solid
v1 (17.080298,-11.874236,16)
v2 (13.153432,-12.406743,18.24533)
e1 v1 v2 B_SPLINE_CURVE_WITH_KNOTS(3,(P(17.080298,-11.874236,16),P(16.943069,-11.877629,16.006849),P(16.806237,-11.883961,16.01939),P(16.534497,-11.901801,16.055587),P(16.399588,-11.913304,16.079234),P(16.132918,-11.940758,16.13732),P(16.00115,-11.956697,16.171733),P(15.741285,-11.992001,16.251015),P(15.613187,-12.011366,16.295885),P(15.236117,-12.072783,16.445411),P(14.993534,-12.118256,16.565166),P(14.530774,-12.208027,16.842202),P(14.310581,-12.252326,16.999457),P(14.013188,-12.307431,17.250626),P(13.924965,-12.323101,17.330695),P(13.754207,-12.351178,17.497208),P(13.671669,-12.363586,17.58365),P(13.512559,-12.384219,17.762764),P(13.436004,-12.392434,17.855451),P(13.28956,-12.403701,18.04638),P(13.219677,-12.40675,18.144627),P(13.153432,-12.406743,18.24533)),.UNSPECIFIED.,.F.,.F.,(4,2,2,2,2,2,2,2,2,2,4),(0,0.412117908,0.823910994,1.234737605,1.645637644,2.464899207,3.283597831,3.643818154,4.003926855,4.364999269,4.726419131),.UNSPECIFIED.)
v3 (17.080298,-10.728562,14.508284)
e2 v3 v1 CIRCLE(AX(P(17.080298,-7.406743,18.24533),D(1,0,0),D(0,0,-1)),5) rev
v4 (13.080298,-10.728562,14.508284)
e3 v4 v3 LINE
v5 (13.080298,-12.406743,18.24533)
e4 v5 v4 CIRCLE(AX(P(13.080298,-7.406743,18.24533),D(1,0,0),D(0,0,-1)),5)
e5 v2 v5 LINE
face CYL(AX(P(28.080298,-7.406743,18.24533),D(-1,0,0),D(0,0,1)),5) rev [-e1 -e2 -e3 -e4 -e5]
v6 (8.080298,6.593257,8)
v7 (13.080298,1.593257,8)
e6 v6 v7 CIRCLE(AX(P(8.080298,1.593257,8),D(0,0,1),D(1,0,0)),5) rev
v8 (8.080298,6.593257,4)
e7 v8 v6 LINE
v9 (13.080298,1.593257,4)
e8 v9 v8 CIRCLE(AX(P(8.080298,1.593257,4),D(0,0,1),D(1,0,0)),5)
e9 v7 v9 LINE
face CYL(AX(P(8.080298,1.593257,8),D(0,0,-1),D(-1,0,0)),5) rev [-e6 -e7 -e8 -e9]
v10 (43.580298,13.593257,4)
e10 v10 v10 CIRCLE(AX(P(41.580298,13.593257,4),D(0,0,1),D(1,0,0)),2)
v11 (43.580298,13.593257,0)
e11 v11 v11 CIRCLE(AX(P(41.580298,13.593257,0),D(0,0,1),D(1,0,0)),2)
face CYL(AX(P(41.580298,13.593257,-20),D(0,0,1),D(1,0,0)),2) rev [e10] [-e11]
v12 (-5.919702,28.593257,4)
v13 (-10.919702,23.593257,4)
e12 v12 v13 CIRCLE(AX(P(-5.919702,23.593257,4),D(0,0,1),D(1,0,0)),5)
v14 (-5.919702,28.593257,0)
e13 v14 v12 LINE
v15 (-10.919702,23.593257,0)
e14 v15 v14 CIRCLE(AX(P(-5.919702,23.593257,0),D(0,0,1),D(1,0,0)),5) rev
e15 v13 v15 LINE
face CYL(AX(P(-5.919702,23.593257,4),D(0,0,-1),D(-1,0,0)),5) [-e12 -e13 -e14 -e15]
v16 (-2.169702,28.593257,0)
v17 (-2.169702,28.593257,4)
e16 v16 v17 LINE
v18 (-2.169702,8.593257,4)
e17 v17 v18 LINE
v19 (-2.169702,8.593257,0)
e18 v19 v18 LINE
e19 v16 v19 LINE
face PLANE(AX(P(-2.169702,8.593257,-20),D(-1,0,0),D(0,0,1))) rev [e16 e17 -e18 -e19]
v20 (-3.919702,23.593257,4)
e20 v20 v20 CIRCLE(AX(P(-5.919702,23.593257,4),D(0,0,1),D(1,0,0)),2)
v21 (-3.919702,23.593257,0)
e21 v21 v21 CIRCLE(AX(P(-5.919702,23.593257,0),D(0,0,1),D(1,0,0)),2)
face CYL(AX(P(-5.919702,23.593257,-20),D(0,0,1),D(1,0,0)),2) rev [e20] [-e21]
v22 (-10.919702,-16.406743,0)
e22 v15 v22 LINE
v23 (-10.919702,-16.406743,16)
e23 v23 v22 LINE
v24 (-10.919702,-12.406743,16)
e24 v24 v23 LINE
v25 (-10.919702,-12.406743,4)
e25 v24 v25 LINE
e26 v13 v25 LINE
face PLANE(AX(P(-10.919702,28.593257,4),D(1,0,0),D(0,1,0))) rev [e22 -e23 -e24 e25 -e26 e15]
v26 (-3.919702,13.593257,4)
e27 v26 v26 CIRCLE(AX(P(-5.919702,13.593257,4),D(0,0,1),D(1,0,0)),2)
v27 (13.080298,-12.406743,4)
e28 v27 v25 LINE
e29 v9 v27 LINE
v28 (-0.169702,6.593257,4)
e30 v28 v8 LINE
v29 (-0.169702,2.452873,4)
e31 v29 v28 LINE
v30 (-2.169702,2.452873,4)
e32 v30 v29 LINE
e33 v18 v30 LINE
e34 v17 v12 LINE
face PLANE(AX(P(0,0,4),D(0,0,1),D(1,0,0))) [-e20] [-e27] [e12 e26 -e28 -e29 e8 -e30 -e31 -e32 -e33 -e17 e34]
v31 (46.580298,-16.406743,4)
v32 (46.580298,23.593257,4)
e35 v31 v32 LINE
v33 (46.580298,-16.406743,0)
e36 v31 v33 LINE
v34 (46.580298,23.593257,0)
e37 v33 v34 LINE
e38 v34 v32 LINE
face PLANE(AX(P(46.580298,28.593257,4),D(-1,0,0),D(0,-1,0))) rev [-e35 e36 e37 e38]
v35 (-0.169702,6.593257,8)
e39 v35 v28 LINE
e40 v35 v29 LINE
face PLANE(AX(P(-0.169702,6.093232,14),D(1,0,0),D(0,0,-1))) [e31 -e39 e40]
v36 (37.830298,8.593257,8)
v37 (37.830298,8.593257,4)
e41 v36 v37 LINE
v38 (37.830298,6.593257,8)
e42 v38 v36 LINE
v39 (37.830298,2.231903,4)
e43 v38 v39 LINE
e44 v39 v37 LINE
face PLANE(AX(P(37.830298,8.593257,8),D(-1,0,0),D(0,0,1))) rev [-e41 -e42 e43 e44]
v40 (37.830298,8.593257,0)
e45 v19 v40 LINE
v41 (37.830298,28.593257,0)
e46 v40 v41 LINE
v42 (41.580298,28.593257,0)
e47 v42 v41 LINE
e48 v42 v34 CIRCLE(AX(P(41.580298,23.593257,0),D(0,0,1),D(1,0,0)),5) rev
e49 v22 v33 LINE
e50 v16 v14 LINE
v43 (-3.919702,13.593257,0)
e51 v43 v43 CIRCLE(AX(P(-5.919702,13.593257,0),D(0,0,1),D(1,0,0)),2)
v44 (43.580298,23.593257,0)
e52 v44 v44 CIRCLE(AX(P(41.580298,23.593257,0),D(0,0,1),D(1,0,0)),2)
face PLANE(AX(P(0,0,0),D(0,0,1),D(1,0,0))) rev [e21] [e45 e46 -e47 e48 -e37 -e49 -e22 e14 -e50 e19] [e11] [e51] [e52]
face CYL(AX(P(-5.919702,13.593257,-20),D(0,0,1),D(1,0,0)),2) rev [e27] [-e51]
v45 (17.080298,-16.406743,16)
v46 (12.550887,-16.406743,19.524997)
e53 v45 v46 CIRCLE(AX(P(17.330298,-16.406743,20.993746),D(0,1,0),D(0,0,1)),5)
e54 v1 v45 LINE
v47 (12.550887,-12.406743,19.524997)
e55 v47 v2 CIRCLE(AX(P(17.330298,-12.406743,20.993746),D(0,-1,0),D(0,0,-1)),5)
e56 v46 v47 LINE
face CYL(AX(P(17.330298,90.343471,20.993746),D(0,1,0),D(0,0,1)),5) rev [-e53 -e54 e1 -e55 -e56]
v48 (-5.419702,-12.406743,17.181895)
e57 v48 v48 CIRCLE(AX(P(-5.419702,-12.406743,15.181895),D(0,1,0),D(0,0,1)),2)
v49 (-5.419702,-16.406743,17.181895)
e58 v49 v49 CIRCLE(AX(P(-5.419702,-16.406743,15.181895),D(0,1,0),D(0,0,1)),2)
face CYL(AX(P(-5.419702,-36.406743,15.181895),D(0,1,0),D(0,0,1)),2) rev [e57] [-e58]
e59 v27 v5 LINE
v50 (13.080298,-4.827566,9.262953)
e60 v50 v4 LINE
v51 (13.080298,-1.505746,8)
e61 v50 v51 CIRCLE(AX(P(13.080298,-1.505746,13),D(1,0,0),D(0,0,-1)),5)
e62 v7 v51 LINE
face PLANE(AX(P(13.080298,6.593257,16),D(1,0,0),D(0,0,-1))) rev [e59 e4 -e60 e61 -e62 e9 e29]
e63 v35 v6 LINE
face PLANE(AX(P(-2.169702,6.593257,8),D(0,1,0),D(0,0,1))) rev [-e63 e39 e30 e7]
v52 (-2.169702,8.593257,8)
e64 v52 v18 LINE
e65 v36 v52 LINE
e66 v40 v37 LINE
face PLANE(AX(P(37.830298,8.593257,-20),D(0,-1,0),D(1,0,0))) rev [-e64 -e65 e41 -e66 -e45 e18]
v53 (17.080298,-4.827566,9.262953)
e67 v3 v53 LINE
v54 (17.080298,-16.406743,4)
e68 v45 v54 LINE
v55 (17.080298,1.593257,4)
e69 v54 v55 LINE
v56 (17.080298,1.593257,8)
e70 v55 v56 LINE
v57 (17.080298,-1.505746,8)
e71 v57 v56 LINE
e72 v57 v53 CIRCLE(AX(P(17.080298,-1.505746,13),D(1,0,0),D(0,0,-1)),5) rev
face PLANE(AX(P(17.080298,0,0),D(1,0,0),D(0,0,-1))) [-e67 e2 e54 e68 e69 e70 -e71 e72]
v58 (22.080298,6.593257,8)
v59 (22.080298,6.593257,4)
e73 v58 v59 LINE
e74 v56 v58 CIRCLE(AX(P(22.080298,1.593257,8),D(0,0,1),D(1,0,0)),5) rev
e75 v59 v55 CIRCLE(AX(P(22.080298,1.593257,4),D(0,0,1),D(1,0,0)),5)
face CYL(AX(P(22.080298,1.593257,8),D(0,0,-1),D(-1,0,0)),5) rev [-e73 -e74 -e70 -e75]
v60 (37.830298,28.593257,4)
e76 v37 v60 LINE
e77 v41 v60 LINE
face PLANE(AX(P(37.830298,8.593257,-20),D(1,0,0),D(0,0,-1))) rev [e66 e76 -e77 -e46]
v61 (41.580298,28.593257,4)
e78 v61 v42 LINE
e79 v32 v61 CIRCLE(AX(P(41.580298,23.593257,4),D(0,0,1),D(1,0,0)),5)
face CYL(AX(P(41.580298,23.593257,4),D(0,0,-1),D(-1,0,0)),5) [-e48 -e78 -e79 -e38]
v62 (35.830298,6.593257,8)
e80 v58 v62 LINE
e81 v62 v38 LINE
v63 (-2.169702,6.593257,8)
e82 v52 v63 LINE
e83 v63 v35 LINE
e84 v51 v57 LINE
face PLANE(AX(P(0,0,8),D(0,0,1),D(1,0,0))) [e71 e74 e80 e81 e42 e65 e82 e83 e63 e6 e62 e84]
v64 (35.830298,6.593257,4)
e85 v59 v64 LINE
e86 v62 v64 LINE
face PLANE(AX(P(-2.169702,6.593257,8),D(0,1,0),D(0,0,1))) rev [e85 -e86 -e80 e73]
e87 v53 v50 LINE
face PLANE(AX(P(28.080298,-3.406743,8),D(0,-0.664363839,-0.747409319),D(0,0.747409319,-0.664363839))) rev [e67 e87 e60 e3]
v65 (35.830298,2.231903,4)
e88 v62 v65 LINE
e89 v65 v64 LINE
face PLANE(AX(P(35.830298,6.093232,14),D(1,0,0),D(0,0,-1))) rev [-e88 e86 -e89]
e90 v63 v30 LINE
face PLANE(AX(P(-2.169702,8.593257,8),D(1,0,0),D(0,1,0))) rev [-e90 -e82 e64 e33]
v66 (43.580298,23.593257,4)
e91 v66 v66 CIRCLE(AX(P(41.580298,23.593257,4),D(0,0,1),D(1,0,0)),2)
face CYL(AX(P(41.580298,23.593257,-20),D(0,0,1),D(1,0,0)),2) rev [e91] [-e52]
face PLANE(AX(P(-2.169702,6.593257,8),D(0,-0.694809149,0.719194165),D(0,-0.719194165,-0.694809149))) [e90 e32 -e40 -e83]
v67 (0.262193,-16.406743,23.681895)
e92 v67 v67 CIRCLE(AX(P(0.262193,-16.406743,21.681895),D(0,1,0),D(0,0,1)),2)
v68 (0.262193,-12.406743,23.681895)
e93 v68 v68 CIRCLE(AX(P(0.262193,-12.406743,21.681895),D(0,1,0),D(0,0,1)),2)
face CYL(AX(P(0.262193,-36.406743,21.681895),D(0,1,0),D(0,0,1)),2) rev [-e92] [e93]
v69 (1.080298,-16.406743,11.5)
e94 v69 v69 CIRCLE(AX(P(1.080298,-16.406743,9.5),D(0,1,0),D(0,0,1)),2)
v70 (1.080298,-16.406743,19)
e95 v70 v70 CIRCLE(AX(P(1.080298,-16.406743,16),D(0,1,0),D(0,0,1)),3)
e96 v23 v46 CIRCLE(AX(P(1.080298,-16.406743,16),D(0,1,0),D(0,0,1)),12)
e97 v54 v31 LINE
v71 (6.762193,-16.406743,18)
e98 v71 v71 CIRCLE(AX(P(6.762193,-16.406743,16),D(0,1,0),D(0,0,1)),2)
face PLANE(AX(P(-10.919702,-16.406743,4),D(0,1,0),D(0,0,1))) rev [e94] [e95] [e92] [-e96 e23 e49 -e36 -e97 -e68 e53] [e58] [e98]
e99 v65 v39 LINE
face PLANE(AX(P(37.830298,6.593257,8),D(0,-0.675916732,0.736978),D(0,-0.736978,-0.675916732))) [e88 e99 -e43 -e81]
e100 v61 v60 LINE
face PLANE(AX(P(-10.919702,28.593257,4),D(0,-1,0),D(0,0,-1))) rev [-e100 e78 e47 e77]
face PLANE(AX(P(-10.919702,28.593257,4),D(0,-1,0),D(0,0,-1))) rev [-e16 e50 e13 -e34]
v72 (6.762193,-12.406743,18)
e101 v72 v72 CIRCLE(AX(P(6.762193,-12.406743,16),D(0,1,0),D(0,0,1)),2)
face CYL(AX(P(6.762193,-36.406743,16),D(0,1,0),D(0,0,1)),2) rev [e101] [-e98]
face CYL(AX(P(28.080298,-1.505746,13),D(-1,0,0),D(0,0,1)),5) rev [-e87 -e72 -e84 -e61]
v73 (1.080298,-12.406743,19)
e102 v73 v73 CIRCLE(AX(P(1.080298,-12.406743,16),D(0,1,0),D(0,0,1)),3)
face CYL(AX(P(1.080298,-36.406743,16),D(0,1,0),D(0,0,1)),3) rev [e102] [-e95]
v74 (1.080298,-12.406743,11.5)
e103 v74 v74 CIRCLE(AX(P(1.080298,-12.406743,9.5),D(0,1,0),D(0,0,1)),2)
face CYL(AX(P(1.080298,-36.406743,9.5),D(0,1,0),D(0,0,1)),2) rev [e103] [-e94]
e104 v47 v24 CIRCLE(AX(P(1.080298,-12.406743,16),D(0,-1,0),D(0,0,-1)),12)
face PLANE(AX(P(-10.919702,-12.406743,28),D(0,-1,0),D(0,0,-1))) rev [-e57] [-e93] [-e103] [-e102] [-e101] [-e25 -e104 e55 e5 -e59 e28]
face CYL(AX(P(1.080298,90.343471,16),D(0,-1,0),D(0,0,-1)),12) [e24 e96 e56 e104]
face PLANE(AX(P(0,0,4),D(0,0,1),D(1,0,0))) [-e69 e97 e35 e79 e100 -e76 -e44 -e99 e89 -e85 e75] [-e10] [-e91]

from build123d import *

# Parameters (mm, degrees)
SKETCH1_W           = 57.5
SKETCH1_H           = 45
BOSS_EXTRUDE1_DEPTH = 4
SKETCH4_W           = 24
SKETCH4_H           = 4
BOSS_EXTRUDE4_DEPTH = 24
CUT_EXTRUDE1_START  = -4
CUT_EXTRUDE1_DEPTH  = 4
SKETCH6_R           = 3
SKETCH6_R_2         = 2
CUT_EXTRUDE2_DEPTH  = 24
SKETCH7_R           = 2
SKETCH7_W           = 40
SKETCH7_H           = 20
CUT_EXTRUDE3_DEPTH  = 24
FILLET2_R           = 5
SKETCH9_W           = 40
SKETCH9_H           = 2
BOSS_EXTRUDE5_DEPTH = 4
RIB1_REACH          = 61.005
SKETCH10_WALL_W     = 125.416867366
SKETCH10_WALL_H     = 2
RIB5_REACH          = 61.005
SKETCH11_WALL_W     = 125.5713139
SKETCH11_WALL_H     = 2
SKETCH13_W          = 12
SKETCH13_H          = 4
BOSS_EXTRUDE7_DEPTH = 4
SKETCH15_W          = 4
SKETCH15_H          = 12
BOSS_EXTRUDE8_DEPTH = 19
CUT_EXTRUDE4_DEPTH  = 15
FILLET5_R           = 5
FILLET6_R           = 5


# Read off the part's stored shape, not the designer's step: Cut-Extrude1
with BuildPart() as part:
    # Sketch1 → Boss-Extrude1 (new body)
    with BuildSketch(Plane.XY):
        with Locations((17.830298358, 6.093256958)):
            Rectangle(SKETCH1_W, SKETCH1_H)
    extrude(amount=BOSS_EXTRUDE1_DEPTH)

    # Sketch4 → Boss-Extrude4 (add)
    with BuildSketch(Plane.XY.offset(4)):
        with Locations((1.080298358, -14.406743042)):
            Rectangle(SKETCH4_W, SKETCH4_H)
    extrude(amount=BOSS_EXTRUDE4_DEPTH)

    # Cut-Extrude1 outline → Cut-Extrude1 (cut)
    with BuildSketch(Plane(origin=(0, -12.406743042, 0), x_dir=(1, 0, 0), z_dir=(0, 1, 0)).offset(CUT_EXTRUDE1_START)):
        with BuildLine():
            Line((13.080298358, -28), (13.080298358, -16))
            ThreePointArc((13.080298358, -16), (9.565579732, -24.485281374), (1.080298358, -28))
            Line((1.080298358, -28), (13.080298358, -28))
        make_face()
        with BuildLine():
            Line((-10.919701642, -28), (1.080298358, -28))
            ThreePointArc((1.080298358, -28), (-7.404983016, -24.485281374), (-10.919701642, -16))
            Line((-10.919701642, -16), (-10.919701642, -28))
        make_face()
    extrude(amount=CUT_EXTRUDE1_DEPTH, mode=Mode.SUBTRACT)

    # Sketch6 → Cut-Extrude2 (cut)
    with BuildSketch(Plane(origin=(0, -12.406743042, 0), x_dir=(1, 0, 0), z_dir=(0, 1, 0))):
        with Locations(Location((1.080298358, -16, 0), (0, 0, 270))):
            Circle(SKETCH6_R)
        with Locations(Location((1.080298358, -9.5, 0), (0, 0, 270))):
            Circle(SKETCH6_R_2)
        with Locations(Location((6.762193148, -16, 0), (0, 0, 270))):
            Circle(SKETCH6_R_2)
        with Locations(Location((0.262193148, -21.681894789, 0), (0, 0, 270))):
            Circle(SKETCH6_R_2)
        with Locations(Location((-5.419701642, -15.181894789, 0), (0, 0, 270))):
            Circle(SKETCH6_R_2)
    extrude(amount=-CUT_EXTRUDE2_DEPTH, mode=Mode.SUBTRACT)

    # Sketch7 → Cut-Extrude3 (cut)
    with BuildSketch(Plane.XY.offset(4)):
        with Locations((-5.919701642, 23.593256958)):
            Circle(SKETCH7_R)
        with Locations((-5.919701642, 13.593256958)):
            Circle(SKETCH7_R)
        with Locations((41.580298358, 23.593256958)):
            Circle(SKETCH7_R)
        with Locations((41.580298358, 13.593256958)):
            Circle(SKETCH7_R)
        with Locations((17.830298358, 18.593256958)):
            Rectangle(SKETCH7_W, SKETCH7_H)
    extrude(amount=-CUT_EXTRUDE3_DEPTH, mode=Mode.SUBTRACT)

    # Fillet2
    fillet2_edges = [part.edges().sort_by_distance(p)[0] for p in [
        (-10.919701642, 28.593256958, 2),
        (46.580298358, 28.593256958, 2),
    ]]
    fillet(fillet2_edges, radius=FILLET2_R)

    # Sketch9 → Boss-Extrude5 (add)
    with BuildSketch(Plane.XY.offset(4)):
        with Locations((17.830298358, 7.593256958)):
            Rectangle(SKETCH9_W, SKETCH9_H)
    extrude(amount=BOSS_EXTRUDE5_DEPTH)

    # Sketch10 wall → Rib1 (add, up to next)
    with BuildSketch(Plane(origin=(37.830298358, 4.600713915, 6.172546288), x_dir=(0, -0.736977999751, -0.675916731471), z_dir=(0, 0.675916731471, -0.736977999751)), mode=Mode.PRIVATE) as rib1_sk1:
        with Locations((0, 1)):
            Rectangle(SKETCH10_WALL_W, SKETCH10_WALL_H)
    rib1_tool1 = extrude(rib1_sk1.sketch, amount=RIB1_REACH, mode=Mode.PRIVATE) - part.part
    add(rib1_tool1.solids().sort_by_distance((37.830298358, 4.600713915, 6.172546288))[0])

    # Sketch11 wall → Rib5 (add, up to next)
    with BuildSketch(Plane(origin=(-2.169701642, 4.593256958, 6.067812051), x_dir=(0, -0.719194164668, -0.694809148981), z_dir=(0, 0.694809148981, -0.719194164668)), mode=Mode.PRIVATE) as rib5_sk1:
        with Locations((0, -1)):
            Rectangle(SKETCH11_WALL_W, SKETCH11_WALL_H)
    rib5_tool1 = extrude(rib5_sk1.sketch, amount=RIB5_REACH, mode=Mode.PRIVATE) - part.part
    add(rib5_tool1.solids().sort_by_distance((-2.169701642, 4.593256958, 6.067812051))[0])

    # Sketch13 → Boss-Extrude7 (add)
    with BuildSketch(Plane(origin=(13.080298358, 0, 0), x_dir=(0, 0, -1), z_dir=(1, 0, 0))):
        with Locations((-10, -14.406743042)):
            Rectangle(SKETCH13_W, SKETCH13_H)
    extrude(amount=BOSS_EXTRUDE7_DEPTH)

    # Sketch15 → Boss-Extrude8 (add)
    with BuildSketch(Plane(origin=(0, -12.406743042, 0), x_dir=(1, 0, 0), z_dir=(0, 1, 0))):
        with Locations((15.080298358, -10)):
            Rectangle(SKETCH15_W, SKETCH15_H)
    extrude(amount=BOSS_EXTRUDE8_DEPTH)

    # Sketch16 → Cut-Extrude4 (cut)
    with BuildSketch(Plane.ZY.offset(-13.080298358)):
        Polygon((8, 6.593256958), (8, -3.406743042), (16, -12.406743042), (16, 6.593256958), align=None)
    extrude(amount=-CUT_EXTRUDE4_DEPTH, mode=Mode.SUBTRACT)

    # Fillet5
    # the kernel refuses this fillet: 5 mm, written as the material it adds along each edge
    with BuildSketch(Plane(origin=(13.080298358, -16.406743042, 16), x_dir=(1, 0, 0), z_dir=(0, 1, 0))) as fillet5_piece_1:
        with BuildLine():
            CenterArc((4.25, -4.993746089), FILLET5_R, 92.865983979, 70.051432775)
            ThreePointArc((-0.529411765, -3.524997239), (-0.133090992, -1.782265577), (0, 0))
            Line((0, 0), (4, 0))
        make_face()
    extrude(amount=4)

    # Fillet6
    fillet6_edges = [part.edges().sort_by_distance(p)[0] for p in [
        (17.080298358, 6.593256958, 6),
        (13.080298358, 6.593256958, 6),
        (15.080298358, -3.406743042, 8),
        (15.080298358, -12.406743042, 16),
    ]]
    fillet(fillet6_edges, radius=FILLET6_R)


solid = part.part
